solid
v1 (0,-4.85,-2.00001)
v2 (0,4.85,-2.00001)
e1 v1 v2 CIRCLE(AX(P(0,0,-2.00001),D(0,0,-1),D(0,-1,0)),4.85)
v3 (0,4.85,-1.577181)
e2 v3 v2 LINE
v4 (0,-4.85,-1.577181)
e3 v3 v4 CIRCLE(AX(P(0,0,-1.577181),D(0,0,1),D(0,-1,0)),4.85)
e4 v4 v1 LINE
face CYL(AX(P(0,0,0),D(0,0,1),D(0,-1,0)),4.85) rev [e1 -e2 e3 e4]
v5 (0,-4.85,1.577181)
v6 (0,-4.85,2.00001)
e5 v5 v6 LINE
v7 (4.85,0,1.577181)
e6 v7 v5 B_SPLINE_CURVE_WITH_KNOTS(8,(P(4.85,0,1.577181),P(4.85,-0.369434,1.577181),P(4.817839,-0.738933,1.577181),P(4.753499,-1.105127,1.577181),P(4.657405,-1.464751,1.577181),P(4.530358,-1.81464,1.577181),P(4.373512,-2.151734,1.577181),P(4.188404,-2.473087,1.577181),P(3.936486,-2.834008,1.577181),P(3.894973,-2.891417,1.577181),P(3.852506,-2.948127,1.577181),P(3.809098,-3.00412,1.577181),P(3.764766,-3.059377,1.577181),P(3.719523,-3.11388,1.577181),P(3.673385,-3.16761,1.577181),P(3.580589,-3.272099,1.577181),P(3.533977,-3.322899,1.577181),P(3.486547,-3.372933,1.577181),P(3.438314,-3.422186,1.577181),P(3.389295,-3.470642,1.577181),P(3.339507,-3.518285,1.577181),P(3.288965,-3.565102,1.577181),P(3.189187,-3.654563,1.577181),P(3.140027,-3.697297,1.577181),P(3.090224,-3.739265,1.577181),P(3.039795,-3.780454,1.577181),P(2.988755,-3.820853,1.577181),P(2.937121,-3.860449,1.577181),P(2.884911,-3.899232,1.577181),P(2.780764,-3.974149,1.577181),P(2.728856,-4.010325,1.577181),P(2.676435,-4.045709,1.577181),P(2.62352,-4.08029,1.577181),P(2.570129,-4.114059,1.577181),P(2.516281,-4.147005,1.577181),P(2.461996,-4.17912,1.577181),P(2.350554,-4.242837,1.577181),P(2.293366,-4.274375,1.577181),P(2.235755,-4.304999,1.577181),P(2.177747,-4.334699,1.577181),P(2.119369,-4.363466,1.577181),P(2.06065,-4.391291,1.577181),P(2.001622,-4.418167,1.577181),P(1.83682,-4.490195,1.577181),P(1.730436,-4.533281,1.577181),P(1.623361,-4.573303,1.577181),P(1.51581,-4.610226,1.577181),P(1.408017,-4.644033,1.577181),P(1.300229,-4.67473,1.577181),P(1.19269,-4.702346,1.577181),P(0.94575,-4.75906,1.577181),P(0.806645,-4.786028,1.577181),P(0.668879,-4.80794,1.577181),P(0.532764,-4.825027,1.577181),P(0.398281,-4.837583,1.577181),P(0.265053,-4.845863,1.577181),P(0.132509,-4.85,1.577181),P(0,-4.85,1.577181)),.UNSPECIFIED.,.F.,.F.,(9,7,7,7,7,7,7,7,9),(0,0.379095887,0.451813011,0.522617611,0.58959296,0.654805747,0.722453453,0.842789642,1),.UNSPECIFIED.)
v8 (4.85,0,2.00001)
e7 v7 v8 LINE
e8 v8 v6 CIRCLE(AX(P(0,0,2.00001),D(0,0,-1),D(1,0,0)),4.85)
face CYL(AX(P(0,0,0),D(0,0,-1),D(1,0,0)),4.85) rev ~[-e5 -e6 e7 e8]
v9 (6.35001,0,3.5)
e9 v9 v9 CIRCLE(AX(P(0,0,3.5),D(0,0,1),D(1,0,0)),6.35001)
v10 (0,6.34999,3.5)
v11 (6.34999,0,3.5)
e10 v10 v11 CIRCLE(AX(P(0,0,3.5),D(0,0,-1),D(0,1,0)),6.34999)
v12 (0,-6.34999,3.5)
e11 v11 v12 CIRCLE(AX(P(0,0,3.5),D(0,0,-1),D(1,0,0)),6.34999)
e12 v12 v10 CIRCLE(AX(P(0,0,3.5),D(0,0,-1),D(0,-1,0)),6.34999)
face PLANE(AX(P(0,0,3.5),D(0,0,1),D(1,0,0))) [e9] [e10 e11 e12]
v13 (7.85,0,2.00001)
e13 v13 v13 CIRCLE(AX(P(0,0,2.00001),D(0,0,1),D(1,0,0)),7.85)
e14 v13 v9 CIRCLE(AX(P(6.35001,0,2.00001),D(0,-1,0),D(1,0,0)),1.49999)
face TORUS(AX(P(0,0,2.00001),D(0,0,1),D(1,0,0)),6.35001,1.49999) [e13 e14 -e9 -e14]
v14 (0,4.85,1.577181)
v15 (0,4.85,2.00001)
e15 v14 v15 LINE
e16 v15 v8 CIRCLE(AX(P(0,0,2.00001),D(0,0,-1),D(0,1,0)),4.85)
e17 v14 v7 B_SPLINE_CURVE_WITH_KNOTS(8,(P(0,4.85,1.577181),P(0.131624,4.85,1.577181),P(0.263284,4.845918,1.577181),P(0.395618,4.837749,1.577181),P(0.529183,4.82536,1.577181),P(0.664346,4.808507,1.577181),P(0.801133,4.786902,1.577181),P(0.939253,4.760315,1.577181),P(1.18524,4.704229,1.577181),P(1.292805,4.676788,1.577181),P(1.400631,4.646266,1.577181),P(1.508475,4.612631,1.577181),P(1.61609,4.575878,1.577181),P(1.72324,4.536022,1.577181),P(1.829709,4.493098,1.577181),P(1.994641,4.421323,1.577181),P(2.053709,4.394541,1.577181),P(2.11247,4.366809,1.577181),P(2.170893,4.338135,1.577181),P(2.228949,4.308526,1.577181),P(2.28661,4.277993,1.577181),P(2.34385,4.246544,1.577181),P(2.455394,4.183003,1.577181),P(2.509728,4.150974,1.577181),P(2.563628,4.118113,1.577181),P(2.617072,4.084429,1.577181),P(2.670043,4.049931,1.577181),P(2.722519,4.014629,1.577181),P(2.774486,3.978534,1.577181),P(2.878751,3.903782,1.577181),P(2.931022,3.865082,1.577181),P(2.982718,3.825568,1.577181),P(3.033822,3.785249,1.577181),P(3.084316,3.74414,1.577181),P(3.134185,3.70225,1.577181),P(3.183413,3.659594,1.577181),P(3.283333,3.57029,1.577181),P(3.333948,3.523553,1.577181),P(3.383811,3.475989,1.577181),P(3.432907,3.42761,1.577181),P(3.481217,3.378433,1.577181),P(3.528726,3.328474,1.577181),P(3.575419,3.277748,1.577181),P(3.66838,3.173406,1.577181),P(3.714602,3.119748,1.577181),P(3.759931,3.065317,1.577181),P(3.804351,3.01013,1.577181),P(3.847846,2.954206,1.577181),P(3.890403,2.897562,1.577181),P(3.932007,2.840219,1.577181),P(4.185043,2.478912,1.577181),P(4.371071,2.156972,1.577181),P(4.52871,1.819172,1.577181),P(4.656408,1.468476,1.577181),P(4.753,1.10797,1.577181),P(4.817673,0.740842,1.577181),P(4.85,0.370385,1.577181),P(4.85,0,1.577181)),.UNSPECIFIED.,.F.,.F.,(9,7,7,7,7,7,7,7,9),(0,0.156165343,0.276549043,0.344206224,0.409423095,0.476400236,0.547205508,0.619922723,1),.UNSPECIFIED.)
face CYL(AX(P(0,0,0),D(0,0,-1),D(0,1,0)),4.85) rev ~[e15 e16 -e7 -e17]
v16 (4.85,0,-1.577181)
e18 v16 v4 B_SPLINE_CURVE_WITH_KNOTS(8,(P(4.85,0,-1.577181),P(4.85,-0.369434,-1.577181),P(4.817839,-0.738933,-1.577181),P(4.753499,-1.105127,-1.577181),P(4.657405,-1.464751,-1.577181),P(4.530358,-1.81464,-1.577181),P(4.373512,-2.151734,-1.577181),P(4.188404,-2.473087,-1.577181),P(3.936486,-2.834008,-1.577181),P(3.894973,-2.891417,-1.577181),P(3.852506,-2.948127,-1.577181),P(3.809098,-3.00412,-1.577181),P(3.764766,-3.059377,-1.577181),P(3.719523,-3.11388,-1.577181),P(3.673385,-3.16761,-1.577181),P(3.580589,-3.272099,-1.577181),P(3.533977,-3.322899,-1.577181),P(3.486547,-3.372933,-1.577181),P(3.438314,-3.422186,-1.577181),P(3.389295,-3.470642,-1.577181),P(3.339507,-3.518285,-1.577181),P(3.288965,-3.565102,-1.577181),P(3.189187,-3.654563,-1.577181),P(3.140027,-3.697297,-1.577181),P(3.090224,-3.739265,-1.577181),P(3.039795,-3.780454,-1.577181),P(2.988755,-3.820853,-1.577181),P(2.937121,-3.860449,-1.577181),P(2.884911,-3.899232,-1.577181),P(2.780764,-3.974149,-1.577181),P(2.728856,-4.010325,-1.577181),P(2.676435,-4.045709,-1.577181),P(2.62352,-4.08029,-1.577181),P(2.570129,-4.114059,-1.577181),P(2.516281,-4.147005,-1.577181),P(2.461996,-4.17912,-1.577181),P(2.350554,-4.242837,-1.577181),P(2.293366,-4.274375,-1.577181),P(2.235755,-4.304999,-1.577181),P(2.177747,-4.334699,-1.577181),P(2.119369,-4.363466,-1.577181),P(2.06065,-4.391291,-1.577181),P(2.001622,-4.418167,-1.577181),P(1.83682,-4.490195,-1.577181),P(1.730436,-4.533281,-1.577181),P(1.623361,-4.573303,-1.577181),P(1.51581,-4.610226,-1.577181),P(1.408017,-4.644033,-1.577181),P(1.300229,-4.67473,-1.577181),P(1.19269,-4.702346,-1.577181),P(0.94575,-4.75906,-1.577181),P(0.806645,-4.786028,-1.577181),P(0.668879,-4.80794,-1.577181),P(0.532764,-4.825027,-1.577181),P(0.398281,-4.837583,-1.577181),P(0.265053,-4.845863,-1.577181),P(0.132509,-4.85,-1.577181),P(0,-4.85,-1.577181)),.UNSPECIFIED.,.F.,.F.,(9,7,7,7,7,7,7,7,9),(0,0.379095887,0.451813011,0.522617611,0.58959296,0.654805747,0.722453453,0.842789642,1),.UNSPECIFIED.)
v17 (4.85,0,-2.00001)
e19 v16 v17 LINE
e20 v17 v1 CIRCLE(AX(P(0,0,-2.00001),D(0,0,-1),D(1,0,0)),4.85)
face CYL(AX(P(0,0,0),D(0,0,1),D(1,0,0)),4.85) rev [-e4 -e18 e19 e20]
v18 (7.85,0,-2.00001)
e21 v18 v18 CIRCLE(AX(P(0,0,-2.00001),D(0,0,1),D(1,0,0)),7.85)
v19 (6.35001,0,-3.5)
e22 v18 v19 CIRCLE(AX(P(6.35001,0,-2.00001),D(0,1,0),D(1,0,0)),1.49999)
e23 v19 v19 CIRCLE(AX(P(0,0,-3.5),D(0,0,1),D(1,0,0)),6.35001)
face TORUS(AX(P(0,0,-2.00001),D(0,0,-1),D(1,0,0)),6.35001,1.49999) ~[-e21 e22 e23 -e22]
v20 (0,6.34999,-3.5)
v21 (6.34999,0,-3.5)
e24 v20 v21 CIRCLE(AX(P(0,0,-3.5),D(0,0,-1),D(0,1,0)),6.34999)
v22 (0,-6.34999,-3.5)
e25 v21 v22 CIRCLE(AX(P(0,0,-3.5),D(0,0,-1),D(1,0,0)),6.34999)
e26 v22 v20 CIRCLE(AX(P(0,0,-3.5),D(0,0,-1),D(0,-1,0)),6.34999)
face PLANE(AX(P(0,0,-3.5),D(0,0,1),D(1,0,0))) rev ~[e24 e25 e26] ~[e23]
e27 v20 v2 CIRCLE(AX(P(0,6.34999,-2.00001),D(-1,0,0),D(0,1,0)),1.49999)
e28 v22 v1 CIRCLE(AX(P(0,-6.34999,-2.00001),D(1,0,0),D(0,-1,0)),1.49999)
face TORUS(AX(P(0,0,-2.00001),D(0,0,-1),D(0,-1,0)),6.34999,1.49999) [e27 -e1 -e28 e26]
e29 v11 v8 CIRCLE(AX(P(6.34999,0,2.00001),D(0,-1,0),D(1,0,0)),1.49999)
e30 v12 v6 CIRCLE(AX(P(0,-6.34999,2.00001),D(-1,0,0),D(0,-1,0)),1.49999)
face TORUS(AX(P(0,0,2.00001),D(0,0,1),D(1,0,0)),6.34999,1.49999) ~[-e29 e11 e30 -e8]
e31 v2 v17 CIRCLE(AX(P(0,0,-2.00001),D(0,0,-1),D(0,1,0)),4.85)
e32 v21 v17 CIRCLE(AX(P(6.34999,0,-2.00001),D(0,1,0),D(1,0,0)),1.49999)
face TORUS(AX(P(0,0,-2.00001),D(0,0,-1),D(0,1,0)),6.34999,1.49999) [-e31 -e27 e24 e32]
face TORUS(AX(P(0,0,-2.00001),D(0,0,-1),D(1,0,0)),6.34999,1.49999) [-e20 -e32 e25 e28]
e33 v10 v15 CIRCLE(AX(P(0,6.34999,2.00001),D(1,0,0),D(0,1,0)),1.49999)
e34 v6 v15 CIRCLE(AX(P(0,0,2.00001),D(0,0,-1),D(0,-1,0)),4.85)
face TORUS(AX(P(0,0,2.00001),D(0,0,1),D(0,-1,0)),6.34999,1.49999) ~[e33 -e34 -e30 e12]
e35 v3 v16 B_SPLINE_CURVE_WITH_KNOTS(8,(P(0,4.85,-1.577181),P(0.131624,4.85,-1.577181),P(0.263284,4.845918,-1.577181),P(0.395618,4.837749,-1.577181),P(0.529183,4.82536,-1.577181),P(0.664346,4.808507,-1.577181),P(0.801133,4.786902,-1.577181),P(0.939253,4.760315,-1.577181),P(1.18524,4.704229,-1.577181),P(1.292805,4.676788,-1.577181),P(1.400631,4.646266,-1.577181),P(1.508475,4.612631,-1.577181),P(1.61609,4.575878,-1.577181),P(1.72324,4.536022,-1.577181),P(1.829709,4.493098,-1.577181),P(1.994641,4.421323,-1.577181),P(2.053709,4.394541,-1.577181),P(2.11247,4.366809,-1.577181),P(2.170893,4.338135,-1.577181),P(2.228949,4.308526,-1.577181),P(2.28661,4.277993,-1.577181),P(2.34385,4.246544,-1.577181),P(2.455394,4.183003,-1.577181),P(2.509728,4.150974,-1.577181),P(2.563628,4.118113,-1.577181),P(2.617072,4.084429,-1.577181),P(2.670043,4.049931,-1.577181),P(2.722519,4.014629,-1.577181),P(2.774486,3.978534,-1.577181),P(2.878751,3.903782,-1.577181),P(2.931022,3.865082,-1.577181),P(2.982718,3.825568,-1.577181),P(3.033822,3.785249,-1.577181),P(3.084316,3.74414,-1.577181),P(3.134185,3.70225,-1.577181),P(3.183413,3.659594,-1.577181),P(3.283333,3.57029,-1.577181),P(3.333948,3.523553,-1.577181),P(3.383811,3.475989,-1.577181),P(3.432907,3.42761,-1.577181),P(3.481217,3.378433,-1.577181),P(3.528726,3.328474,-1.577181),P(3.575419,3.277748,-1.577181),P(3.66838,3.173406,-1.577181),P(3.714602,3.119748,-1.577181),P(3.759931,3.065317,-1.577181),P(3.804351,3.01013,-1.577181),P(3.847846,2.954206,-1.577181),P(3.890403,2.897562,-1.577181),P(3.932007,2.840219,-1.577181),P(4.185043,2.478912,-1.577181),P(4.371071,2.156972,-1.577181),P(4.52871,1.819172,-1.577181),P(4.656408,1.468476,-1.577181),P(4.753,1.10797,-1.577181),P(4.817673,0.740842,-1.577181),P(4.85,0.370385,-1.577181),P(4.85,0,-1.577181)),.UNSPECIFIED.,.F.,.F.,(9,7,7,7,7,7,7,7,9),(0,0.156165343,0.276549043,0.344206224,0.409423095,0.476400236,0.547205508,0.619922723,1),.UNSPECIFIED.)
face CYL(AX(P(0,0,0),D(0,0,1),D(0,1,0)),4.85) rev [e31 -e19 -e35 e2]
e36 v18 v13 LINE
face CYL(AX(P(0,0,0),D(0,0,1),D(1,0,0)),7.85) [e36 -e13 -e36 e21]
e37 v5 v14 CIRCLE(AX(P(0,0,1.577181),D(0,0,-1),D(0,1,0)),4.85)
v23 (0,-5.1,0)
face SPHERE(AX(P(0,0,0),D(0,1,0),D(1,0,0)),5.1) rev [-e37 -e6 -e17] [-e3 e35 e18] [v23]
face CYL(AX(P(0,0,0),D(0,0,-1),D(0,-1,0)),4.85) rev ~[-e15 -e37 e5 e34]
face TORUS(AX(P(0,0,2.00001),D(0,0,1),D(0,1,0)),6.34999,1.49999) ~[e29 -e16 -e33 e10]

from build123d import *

# Parameters (mm, degrees)
F0_R     = 7.85
F1_DEPTH = 3.5
F3_R     = 1.49999


# Not quite as in the source:
# - a fillet or chamfer is up to 0.001 mm smaller than in the source, because OpenCascade refuses the exact size


with BuildPart() as f1:
    # F0 (on Top) → F1 (new body, symmetric)
    with BuildSketch(Plane.XY):
        Circle(F0_R)
        with BuildLine():
            ThreePointArc((0, -4.85), (-4.85, 0), (0, 4.85))
            Line((0, 4.85), (0, 5.1))
            ThreePointArc((0, 5.1), (5.1, 0), (0, -5.1))
            Line((0, -5.1), (0, -4.85))
        make_face(mode=Mode.SUBTRACT)
        with BuildLine():
            ThreePointArc((0, 4.85), (3.4294678888, 3.4294678888), (4.85, 0))
            ThreePointArc((4.85, 0), (3.4294678888, -3.4294678888), (0, -4.85))
            Line((0, -4.85), (0, -5.1))
            ThreePointArc((0, -5.1), (5.1, 0), (0, 5.1))
            Line((0, 5.1), (0, 4.85))
        make_face()
    extrude(amount=F1_DEPTH, both=True)

    # F0 (on Top) → F2 (revolve, cut)
    with BuildSketch(Plane.XY):
        with BuildLine():
            ThreePointArc((0, -4.85), (3.4294678888, -3.4294678888), (4.85, 0))
            ThreePointArc((4.85, 0), (3.4294678888, 3.4294678888), (0, 4.85))
            Line((0, 4.85), (0, -4.85))
        make_face()
        with BuildLine():
            ThreePointArc((0, 4.85), (3.4294678888, 3.4294678888), (4.85, 0))
            ThreePointArc((4.85, 0), (3.4294678888, -3.4294678888), (0, -4.85))
            Line((0, -4.85), (0, -5.1))
            ThreePointArc((0, -5.1), (5.1, 0), (0, 5.1))
            Line((0, 5.1), (0, 4.85))
        make_face()
    revolve(axis=Axis((0, 0, 0), (0, -1, 0)), mode=Mode.SUBTRACT)

    # F3 (radius 1.5 in the source; OpenCascade refuses exactly that, so slightly less here)
    f3_edges = [f1.edges().sort_by_distance(p)[0] for p in [
        (-7.85, 0, 3.5),
        (0, -4.85, 3.5),
        (0, -4.85, -3.5),
        (-7.85, 0, -3.5),
    ]]
    fillet(f3_edges, radius=F3_R)


solid = f1.part
